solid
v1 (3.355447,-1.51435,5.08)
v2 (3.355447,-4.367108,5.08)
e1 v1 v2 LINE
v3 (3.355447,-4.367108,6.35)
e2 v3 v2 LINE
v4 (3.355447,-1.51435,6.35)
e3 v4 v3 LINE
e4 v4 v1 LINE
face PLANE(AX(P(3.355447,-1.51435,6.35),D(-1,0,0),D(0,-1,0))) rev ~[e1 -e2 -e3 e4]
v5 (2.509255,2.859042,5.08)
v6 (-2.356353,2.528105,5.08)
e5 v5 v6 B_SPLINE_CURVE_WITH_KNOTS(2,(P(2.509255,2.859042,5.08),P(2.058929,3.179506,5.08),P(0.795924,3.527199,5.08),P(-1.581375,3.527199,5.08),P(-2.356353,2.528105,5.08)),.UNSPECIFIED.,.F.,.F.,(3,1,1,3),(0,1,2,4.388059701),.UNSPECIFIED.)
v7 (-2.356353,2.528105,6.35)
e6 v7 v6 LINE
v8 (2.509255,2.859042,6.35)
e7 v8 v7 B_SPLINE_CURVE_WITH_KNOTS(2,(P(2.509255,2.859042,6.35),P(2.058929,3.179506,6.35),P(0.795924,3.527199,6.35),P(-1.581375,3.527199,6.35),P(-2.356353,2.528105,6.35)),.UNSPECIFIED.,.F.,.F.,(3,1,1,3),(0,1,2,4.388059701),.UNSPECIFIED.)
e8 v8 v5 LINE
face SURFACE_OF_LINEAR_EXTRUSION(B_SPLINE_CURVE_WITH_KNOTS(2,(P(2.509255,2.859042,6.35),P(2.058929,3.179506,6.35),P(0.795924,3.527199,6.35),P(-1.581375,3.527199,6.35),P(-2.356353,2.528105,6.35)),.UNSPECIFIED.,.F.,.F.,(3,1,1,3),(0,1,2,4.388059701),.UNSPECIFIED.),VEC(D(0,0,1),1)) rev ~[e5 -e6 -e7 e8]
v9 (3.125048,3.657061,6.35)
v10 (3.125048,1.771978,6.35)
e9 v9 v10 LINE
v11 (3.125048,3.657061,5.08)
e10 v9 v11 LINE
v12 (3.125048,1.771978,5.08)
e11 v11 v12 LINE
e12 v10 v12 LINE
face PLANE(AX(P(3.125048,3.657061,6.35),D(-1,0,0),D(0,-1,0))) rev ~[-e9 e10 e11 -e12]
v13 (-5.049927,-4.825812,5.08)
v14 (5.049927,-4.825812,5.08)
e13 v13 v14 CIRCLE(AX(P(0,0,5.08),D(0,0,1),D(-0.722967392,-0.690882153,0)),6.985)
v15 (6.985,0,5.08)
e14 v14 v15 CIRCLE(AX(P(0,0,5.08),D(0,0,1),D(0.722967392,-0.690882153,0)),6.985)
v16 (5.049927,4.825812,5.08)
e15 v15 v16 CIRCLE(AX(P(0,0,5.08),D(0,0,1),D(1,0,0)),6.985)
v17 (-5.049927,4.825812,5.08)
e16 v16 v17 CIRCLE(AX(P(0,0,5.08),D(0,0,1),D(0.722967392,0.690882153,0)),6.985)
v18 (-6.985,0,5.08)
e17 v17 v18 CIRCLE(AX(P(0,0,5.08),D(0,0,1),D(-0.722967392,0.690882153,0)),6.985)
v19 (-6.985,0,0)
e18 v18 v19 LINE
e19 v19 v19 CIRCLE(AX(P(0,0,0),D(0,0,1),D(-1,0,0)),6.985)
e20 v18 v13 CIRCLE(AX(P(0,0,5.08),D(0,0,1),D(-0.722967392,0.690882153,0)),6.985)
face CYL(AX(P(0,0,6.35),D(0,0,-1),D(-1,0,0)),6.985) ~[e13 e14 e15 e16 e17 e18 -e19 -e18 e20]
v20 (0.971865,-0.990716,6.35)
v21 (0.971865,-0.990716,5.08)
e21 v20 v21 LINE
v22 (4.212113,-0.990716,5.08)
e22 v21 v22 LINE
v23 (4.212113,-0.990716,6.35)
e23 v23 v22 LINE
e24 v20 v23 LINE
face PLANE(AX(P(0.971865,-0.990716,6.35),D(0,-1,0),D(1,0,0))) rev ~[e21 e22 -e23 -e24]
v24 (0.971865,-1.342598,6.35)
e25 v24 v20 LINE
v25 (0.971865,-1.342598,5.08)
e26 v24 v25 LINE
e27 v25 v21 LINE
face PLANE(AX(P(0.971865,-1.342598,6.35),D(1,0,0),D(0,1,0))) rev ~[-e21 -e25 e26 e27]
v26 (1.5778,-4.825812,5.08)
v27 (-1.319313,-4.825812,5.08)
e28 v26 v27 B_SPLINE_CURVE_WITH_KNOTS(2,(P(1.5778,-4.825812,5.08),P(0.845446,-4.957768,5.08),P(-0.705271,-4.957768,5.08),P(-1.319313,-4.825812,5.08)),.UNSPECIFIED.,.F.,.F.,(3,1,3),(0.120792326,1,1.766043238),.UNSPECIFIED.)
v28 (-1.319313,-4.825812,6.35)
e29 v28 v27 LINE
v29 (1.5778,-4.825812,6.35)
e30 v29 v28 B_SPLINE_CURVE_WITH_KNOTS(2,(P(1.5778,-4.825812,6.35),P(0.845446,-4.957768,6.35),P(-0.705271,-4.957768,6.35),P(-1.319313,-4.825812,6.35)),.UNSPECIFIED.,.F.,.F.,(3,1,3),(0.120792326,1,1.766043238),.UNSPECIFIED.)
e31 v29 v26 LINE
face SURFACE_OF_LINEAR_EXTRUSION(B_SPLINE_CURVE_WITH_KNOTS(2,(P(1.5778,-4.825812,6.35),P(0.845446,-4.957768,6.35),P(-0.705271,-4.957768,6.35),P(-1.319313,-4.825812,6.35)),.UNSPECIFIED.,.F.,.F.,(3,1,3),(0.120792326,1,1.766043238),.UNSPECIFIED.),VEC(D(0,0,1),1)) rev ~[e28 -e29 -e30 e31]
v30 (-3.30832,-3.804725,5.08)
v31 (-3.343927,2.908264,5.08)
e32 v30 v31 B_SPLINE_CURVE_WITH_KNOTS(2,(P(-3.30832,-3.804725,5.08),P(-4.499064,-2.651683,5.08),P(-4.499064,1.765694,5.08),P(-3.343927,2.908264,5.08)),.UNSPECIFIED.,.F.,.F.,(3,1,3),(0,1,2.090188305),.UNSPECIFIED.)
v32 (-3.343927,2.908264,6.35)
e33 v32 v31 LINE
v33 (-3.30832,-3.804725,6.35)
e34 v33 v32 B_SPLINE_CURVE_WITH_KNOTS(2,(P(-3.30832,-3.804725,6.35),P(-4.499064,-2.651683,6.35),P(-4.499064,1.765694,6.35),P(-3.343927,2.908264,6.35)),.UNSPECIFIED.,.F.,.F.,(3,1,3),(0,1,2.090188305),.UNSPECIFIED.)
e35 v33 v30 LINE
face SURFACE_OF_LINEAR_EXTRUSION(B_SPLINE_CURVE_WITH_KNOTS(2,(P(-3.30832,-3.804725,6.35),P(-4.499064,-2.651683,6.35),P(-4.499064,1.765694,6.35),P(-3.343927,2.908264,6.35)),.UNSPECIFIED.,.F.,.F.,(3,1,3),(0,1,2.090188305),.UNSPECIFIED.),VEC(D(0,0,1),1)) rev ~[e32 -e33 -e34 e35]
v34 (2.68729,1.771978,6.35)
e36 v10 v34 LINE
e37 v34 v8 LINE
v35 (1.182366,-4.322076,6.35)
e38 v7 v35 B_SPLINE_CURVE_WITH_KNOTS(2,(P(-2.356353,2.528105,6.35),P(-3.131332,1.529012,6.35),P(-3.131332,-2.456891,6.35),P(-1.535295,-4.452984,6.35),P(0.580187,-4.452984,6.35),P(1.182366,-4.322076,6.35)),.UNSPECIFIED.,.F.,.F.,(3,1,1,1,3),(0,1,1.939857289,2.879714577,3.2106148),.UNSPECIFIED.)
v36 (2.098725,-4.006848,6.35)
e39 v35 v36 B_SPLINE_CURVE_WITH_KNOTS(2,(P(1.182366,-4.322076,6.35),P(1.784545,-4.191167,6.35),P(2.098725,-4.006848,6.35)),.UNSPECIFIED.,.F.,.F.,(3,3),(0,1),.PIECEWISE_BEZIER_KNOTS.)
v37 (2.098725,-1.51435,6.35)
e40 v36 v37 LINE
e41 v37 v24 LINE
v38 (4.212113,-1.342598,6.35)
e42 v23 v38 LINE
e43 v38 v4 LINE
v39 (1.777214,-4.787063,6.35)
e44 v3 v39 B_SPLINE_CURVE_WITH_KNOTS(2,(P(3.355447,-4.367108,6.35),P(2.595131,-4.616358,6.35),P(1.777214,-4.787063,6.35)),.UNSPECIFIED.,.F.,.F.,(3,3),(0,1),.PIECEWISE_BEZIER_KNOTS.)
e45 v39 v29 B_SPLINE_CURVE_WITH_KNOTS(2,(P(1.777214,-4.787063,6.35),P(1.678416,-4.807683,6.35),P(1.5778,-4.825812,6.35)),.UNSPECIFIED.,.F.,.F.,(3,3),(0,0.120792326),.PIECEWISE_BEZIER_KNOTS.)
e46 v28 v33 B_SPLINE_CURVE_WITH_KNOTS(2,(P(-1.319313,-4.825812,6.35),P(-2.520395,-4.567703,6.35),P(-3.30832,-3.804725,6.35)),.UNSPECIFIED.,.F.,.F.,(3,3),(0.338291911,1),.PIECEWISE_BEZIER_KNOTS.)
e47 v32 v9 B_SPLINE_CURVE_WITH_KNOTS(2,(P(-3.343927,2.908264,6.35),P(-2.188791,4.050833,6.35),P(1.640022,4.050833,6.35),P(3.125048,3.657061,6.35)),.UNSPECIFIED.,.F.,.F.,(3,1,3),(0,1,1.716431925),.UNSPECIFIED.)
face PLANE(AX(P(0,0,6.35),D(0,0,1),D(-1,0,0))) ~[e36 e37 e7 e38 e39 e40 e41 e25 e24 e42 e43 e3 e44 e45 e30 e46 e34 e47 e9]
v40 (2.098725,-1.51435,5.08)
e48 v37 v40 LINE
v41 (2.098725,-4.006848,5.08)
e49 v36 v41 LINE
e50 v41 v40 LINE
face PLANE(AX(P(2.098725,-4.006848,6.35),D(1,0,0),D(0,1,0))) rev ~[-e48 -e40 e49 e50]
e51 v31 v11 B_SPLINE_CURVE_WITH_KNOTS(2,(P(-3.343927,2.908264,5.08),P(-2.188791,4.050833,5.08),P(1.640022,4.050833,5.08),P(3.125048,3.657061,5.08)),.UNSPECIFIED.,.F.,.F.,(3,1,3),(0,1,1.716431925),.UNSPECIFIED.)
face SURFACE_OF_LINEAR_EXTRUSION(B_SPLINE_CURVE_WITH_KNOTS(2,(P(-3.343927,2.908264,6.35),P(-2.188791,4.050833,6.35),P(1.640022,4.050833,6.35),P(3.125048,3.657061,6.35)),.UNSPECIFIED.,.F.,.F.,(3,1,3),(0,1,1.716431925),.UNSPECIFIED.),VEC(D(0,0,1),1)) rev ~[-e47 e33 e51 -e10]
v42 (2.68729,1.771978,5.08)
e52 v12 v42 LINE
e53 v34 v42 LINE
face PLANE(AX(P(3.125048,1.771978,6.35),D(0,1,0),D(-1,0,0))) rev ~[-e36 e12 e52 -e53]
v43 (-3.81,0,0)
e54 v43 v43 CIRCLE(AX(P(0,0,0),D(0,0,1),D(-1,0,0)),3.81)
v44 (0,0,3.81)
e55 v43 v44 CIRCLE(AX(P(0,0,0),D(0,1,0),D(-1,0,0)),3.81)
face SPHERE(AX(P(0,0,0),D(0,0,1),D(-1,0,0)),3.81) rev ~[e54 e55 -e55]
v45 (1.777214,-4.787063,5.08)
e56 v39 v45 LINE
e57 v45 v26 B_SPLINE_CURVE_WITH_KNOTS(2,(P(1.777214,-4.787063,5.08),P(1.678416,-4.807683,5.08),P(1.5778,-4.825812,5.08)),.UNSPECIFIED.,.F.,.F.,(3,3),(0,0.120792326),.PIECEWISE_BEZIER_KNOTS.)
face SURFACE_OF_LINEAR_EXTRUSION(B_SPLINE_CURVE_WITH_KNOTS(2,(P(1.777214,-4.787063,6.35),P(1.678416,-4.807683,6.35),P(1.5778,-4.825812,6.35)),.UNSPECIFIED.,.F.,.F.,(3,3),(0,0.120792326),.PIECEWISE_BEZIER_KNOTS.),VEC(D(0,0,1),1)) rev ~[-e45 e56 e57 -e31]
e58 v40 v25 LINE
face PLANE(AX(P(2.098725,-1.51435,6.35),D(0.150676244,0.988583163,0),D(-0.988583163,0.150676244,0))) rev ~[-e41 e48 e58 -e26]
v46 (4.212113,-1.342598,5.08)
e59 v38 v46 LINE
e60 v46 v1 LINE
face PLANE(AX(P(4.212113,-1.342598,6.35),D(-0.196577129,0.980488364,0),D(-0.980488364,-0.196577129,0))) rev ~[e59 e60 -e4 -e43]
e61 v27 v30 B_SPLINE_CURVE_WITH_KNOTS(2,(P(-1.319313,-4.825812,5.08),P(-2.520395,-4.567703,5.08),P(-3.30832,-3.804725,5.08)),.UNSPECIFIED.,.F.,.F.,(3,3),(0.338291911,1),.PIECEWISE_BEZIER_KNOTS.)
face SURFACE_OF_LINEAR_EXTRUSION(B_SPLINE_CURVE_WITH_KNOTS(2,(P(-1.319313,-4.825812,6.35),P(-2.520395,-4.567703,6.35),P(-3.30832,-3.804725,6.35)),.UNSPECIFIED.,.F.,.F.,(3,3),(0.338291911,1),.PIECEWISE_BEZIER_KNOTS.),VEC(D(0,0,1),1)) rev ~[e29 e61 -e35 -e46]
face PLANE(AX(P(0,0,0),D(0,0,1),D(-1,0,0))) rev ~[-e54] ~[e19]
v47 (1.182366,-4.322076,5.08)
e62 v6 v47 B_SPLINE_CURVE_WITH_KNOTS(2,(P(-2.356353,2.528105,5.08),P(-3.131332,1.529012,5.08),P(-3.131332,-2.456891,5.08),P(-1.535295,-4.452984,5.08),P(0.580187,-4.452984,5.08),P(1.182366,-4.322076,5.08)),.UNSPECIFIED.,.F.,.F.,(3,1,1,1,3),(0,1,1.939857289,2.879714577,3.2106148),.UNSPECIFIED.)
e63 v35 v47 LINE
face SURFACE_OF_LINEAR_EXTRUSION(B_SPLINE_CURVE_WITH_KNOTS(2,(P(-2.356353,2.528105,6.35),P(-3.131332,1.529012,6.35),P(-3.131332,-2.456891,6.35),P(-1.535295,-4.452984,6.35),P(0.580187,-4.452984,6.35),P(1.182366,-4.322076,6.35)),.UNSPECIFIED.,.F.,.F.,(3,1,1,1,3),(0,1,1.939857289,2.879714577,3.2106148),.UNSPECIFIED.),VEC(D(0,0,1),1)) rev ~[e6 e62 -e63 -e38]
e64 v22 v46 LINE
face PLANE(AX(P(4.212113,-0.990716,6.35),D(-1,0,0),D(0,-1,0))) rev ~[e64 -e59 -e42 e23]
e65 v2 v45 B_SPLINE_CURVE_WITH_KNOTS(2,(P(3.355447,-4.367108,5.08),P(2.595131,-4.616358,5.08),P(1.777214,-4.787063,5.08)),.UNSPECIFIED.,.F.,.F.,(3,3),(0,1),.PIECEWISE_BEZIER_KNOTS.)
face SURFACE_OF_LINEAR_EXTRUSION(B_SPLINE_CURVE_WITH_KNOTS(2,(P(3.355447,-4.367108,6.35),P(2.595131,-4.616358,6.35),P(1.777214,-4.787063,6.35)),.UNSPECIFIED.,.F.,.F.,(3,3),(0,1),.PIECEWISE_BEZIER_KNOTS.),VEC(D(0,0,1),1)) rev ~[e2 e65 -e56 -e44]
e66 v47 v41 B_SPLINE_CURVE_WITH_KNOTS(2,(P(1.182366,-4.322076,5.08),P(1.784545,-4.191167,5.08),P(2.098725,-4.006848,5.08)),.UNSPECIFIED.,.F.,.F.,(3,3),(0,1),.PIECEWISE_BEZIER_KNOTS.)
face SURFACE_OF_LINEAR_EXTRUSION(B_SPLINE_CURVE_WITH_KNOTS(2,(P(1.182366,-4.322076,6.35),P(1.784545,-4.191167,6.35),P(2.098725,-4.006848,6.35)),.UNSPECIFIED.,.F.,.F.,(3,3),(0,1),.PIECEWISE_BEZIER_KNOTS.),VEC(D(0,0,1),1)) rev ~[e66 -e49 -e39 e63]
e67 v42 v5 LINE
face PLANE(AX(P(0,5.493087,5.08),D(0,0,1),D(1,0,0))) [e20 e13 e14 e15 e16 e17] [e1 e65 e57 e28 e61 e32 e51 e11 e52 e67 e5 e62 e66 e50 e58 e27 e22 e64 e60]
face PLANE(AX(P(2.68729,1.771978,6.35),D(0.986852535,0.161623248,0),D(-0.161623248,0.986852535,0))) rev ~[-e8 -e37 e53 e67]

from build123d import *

# Parameters (mm, degrees)
F3_DEPTH = 1.27


with BuildPart() as f1:
    # F0 (on Front) → F1 (revolve)
    with BuildSketch(Plane.XZ):
        with BuildLine():
            Line((-6.985, 6.35), (-6.985, 0))
            Line((-6.985, 0), (-3.81, 0))
            ThreePointArc((-3.81, 0), (-2.6940768363, 2.6940768363), (0, 3.81))
            Line((0, 3.81), (0, 6.35))
            Line((0, 6.35), (-6.985, 6.35))
        make_face()
    revolve(axis=Axis((0, 0, 5.08), (0, 0, 1)))

    # F2 (on face) → F3 (cut)
    with BuildSketch(Plane.XY.offset(6.35)):
        with BuildLine():
            Line((-5.0499272347, 4.825811841), (5.0499272347, 4.825811841))
            ThreePointArc((5.0499272347, 4.825811841), (0, 6.985), (-5.0499272347, 4.825811841))
        make_face()
        with BuildLine():
            Line((5.0499272347, -4.825811841), (5.0499272347, 4.825811841))
            Line((5.0499272347, 4.825811841), (-5.0499272347, 4.825811841))
            Line((-5.0499272347, 4.825811841), (-5.0499272347, -4.825811841))
            Line((-5.0499272347, -4.825811841), (-1.3193129815, -4.825811841))
            add(Edge.make_bspline(
                [(-1.3193129815, -4.825811841), (-2.5203953314, -4.5677027566), (-3.3083202269, -3.8047253512)],
                knots=[0.3382919108, 0.3382919108, 0.3382919108, 1, 1, 1], degree=2))
            add(Edge.make_bspline(
                [(-3.3083202269, -3.8047253512), (-4.4990641643, -2.6516830689), (-4.4990641643, -0.5382958521)],
                knots=[0, 0, 0, 1, 1, 1], degree=2))
            add(Edge.make_bspline(
                [(-4.4990641643, -0.5382958521), (-4.4990641643, 1.7656941762), (-3.3439273456, 2.9082637766)],
                knots=[0, 0, 0, 1, 1, 1], degree=2))
            add(Edge.make_bspline(
                [(-3.3439273456, 2.9082637766), (-2.1887905268, 4.0508333769), (0.0418907278, 4.0508333769)],
                knots=[0, 0, 0, 1, 1, 1], degree=2))
            add(Edge.make_bspline(
                [(0.0418907278, 4.0508333769), (1.6400219928, 4.0508333769), (3.1250482929, 3.6570605358)],
                knots=[0, 0, 0, 1, 1, 1], degree=2))
            Line((3.1250482929, 3.6570605358), (3.1250482929, 1.7719777854))
            Line((3.1250482929, 1.7719777854), (2.6872901875, 1.7719777854))
            Line((2.6872901875, 1.7719777854), (2.5092545944, 2.8590421714))
            add(Edge.make_bspline(
                [(2.5092545944, 2.8590421714), (2.0589292707, 3.179506239), (1.4274265493, 3.3533527593)],
                knots=[0, 0, 0, 1, 1, 1], degree=2))
            add(Edge.make_bspline(
                [(1.4274265493, 3.3533527593), (0.7959238279, 3.5271992796), (0.0942541375, 3.5271992796)],
                knots=[0, 0, 0, 1, 1, 1], degree=2))
            add(Edge.make_bspline(
                [(0.0942541375, 3.5271992796), (-1.5813749739, 3.5271992796), (-2.356353438, 2.5281054219)],
                knots=[0, 0, 0, 1, 1, 1], degree=2))
            add(Edge.make_bspline(
                [(-2.356353438, 2.5281054219), (-3.131331902, 1.5290115642), (-3.131331902, -0.5257286337)],
                knots=[0, 0, 0, 1, 1, 1], degree=2))
            add(Edge.make_bspline(
                [(-3.131331902, -0.5257286337), (-3.131331902, -2.4568911847), (-2.3333135377, -3.4549377742)],
                knots=[0, 0, 0, 1, 1, 1], degree=2))
            add(Edge.make_bspline(
                [(-2.3333135377, -3.4549377742), (-1.5352951734, -4.4529843637), (0.0293235095, -4.4529843637)],
                knots=[0, 0, 0, 1, 1, 1], degree=2))
            add(Edge.make_bspline(
                [(0.0293235095, -4.4529843637), (0.5801865798, -4.4529843637), (1.1823657918, -4.3220758394)],
                knots=[0, 0, 0, 1, 1, 1], degree=2))
            add(Edge.make_bspline(
                [(1.1823657918, -4.3220758394), (1.7845450037, -4.191167315), (2.0987254621, -4.0068481128)],
                knots=[0, 0, 0, 1, 1, 1], degree=2))
            Line((2.0987254621, -4.0068481128), (2.0987254621, -1.5143498095))
            Line((2.0987254621, -1.5143498095), (0.9718648846, -1.3425978256))
            Line((0.9718648846, -1.3425978256), (0.9718648846, -0.9907157121))
            Line((0.9718648846, -0.9907157121), (4.2121126789, -0.9907157121))
            Line((4.2121126789, -0.9907157121), (4.2121126789, -1.3425978256))
            Line((4.2121126789, -1.3425978256), (3.3554472957, -1.5143498095))
            Line((3.3554472957, -1.5143498095), (3.3554472957, -4.3671083717))
            add(Edge.make_bspline(
                [(3.3554472957, -4.3671083717), (2.5951305864, -4.6163582021), (1.7772141263, -4.7870629178)],
                knots=[0, 0, 0, 1, 1, 1], degree=2))
            add(Edge.make_bspline(
                [(1.7772141263, -4.7870629178), (1.6784160951, -4.8076827374), (1.5777996884, -4.825811841)],
                knots=[0, 0, 0, 0.1207923255, 0.1207923255, 0.1207923255], degree=2))
            Line((1.5777996884, -4.825811841), (5.0499272347, -4.825811841))
        make_face()
        with BuildLine():
            Line((-5.0499272347, -4.825811841), (-5.0499272347, 4.825811841))
            ThreePointArc((-5.0499272347, 4.825811841), (-6.985, 0), (-5.0499272347, -4.825811841))
        make_face()
        with BuildLine():
            ThreePointArc((-5.0499272347, -4.825811841), (0, -6.985), (5.0499272347, -4.825811841))
            Line((5.0499272347, -4.825811841), (1.5777996884, -4.825811841))
            add(Edge.make_bspline(
                [(1.5777996884, -4.825811841), (0.8454459018, -4.9577676335), (0.0167562911, -4.9577676335)],
                knots=[0.1207923255, 0.1207923255, 0.1207923255, 1, 1, 1], degree=2))
            add(Edge.make_bspline(
                [(0.0167562911, -4.9577676335), (-0.7052711558, -4.9577676335), (-1.3193129815, -4.825811841)],
                knots=[0, 0, 0, 0.3382919108, 0.3382919108, 0.3382919108], degree=2))
            Line((-1.3193129815, -4.825811841), (-5.0499272347, -4.825811841))
        make_face()
        with BuildLine():
            ThreePointArc((6.985, 0), (6.4832077992, 2.5996618305), (5.0499272347, 4.825811841))
            Line((5.0499272347, 4.825811841), (5.0499272347, -4.825811841))
            ThreePointArc((5.0499272347, -4.825811841), (6.4832077992, -2.5996618305), (6.985, 0))
        make_face()
    extrude(amount=-F3_DEPTH, mode=Mode.SUBTRACT)


solid = f1.part
